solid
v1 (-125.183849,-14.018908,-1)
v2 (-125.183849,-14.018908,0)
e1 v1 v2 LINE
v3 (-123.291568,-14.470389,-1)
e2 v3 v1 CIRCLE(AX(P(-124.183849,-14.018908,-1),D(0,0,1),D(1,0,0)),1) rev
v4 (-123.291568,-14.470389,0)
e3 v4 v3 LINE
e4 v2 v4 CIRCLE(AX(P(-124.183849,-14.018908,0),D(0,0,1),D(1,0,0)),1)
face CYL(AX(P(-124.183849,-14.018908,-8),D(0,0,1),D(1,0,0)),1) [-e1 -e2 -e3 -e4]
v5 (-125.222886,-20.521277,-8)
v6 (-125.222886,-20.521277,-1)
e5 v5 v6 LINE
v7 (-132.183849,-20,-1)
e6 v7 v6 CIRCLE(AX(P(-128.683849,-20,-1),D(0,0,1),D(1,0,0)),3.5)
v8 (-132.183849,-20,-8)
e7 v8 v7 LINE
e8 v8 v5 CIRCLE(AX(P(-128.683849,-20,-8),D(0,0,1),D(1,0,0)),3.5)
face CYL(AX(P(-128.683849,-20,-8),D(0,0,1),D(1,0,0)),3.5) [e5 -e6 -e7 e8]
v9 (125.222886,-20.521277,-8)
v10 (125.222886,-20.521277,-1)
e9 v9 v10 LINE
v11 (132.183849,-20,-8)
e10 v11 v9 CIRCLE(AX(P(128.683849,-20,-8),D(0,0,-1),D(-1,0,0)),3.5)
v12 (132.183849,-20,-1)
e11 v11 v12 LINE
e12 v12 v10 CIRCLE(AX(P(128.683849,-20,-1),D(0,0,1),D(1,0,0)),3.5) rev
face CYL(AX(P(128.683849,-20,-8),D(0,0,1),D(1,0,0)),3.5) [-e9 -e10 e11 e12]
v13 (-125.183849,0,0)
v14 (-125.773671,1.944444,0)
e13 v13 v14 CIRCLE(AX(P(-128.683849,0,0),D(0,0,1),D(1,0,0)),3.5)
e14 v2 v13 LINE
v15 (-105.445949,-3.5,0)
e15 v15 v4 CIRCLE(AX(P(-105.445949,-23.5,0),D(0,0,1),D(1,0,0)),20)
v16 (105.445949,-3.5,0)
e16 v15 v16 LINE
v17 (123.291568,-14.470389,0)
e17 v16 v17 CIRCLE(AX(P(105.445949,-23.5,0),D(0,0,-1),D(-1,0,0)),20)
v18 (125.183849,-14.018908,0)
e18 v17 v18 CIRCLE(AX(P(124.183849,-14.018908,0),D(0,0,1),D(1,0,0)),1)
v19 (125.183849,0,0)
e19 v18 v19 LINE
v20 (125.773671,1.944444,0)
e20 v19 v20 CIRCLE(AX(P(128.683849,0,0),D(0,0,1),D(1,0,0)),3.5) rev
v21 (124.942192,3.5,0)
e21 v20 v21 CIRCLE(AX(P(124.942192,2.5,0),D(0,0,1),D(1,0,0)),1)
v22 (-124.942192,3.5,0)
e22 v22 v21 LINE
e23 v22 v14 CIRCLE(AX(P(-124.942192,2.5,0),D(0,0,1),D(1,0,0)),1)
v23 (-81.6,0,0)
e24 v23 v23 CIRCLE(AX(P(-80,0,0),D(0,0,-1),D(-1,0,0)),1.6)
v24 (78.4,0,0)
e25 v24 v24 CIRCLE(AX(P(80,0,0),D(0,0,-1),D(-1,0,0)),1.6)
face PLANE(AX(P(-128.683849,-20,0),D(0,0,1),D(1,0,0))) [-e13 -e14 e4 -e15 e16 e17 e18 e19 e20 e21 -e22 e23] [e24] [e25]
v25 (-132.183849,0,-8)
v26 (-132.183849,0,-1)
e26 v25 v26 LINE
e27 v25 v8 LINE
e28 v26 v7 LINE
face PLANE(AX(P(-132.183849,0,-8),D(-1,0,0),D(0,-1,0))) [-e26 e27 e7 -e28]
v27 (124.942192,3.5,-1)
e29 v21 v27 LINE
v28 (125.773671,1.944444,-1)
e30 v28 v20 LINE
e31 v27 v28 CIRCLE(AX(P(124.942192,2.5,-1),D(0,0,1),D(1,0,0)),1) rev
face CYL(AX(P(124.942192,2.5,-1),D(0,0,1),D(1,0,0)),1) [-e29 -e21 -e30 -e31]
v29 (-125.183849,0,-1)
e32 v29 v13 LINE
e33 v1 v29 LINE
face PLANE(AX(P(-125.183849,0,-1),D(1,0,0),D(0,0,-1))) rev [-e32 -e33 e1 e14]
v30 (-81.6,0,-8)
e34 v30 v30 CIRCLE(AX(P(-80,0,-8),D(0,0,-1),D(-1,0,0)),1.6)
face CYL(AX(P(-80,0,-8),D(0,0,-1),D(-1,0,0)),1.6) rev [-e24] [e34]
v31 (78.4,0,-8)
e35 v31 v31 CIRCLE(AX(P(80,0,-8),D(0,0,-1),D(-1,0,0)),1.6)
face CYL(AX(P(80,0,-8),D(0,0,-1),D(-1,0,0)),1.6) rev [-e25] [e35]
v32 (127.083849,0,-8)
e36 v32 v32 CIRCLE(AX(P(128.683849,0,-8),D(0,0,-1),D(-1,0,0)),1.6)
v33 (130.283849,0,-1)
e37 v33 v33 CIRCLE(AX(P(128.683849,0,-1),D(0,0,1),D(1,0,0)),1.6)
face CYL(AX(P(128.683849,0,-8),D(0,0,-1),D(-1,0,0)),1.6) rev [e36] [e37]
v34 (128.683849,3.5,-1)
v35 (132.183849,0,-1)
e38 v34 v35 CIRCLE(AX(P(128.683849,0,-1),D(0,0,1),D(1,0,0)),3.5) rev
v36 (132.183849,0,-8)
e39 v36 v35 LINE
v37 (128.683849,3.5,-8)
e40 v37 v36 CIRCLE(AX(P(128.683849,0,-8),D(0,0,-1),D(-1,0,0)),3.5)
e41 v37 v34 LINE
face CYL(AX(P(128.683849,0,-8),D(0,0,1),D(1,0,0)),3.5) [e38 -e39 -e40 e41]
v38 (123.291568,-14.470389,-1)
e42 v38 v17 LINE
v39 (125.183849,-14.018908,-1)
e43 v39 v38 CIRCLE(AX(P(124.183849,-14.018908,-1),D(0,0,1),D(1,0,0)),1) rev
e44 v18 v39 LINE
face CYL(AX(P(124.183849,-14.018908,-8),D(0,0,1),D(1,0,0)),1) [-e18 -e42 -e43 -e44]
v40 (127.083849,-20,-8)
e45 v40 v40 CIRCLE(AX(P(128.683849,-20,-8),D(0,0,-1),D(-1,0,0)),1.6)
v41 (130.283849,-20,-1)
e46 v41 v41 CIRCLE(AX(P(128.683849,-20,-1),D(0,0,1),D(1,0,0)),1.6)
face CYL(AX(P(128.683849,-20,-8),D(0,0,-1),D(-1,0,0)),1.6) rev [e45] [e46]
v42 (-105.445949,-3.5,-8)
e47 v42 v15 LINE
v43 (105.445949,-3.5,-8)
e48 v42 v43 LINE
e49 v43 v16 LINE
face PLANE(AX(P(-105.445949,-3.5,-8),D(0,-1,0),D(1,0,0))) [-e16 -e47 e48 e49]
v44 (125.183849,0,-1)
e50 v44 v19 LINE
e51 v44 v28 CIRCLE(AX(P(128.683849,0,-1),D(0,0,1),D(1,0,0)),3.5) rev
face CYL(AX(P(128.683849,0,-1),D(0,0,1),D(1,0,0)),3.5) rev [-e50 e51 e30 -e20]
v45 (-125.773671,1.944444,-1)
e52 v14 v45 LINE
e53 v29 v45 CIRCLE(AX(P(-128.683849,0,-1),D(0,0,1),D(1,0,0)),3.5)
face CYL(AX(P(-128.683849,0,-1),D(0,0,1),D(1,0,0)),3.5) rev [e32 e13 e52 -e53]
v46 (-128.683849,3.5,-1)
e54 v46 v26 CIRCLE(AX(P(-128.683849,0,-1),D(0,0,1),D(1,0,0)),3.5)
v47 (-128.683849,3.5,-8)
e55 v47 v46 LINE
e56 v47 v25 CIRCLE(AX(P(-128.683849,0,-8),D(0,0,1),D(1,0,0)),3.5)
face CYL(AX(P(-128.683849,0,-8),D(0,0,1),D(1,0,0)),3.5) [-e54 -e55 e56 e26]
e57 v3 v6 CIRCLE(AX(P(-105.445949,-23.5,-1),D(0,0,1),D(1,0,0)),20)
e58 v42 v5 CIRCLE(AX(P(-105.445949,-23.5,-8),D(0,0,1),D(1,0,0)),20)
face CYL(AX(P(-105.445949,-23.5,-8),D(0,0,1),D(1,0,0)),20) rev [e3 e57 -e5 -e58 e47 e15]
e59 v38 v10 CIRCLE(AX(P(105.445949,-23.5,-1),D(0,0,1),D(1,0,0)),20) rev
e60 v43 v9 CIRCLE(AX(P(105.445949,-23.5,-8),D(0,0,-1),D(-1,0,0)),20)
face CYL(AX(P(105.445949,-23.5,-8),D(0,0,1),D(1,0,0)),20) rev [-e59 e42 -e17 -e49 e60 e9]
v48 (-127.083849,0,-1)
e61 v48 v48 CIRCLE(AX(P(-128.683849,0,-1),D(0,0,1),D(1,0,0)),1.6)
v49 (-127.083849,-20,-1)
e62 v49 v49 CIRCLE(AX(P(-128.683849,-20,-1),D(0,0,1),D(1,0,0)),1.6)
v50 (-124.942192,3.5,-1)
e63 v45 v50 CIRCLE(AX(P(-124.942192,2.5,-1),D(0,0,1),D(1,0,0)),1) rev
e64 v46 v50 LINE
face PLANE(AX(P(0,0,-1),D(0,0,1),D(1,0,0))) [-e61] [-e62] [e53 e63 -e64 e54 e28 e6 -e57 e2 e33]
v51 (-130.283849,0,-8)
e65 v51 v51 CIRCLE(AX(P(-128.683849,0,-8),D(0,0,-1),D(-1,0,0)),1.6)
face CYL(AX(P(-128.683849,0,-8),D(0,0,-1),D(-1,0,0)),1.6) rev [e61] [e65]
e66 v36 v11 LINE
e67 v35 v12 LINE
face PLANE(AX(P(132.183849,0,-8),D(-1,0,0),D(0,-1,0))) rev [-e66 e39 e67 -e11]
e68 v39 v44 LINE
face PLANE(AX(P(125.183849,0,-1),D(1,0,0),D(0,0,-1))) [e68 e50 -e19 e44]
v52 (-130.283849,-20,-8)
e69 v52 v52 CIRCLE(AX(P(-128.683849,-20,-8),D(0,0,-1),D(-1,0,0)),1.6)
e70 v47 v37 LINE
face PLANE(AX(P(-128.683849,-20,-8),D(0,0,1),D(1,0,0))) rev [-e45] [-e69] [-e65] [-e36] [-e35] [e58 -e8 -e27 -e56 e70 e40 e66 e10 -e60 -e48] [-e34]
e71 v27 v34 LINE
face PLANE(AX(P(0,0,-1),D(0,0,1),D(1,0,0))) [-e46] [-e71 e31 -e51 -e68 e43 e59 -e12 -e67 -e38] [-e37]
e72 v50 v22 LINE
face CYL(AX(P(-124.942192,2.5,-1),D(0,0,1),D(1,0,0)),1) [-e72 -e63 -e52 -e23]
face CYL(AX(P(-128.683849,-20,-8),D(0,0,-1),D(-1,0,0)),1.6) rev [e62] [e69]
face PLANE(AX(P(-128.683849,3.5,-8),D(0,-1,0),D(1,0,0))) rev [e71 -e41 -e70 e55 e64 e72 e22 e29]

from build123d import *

# Parameters (mm, degrees)
EXTRUDE_1_DEPTH     = 8
CUT_EXTRUDE_1_DEPTH = 1
FILLET_1_R          = 1
HOLE_WIZARD_M3_1_D  = 3.2


with BuildPart() as part:
    # ｽｹｯﾁ1 → ﾎﾞｽ - 押し出し1 (new body)
    with BuildSketch(Plane.XY):
        with BuildLine():
            Line((-128.683849372, 3.5), (128.683849372, 3.5))
            ThreePointArc((128.683849372, 3.5), (131.158723106, 2.474873734), (132.183849372, 0))
            Line((132.183849372, 0), (132.183849372, -20))
            ThreePointArc((132.183849372, -20), (128.945217461, -23.490227317), (125.222885531, -20.521276596))
            ThreePointArc((125.222885531, -20.521276596), (118.492510756, -8.341265421), (105.445949295, -3.5))
            Line((105.445949295, -3.5), (-105.445949295, -3.5))
            ThreePointArc((-105.445949295, -3.5), (-118.492510756, -8.341265421), (-125.222885531, -20.521276596))
            ThreePointArc((-125.222885531, -20.521276596), (-128.945217461, -23.490227317), (-132.183849372, -20))
            Line((-132.183849372, -20), (-132.183849372, 0))
            ThreePointArc((-132.183849372, 0), (-131.158723106, 2.474873734), (-128.683849372, 3.5))
        make_face()
    extrude(amount=-EXTRUDE_1_DEPTH)

    # ｽｹｯﾁ1<4> → ｶｯﾄ - 押し出し1 (cut)
    with BuildSketch(Plane.XY):
        with BuildLine():
            ThreePointArc((-125.183849372, 0), (-126.208975638, 2.474873734), (-128.683849372, 3.5))
            ThreePointArc((-128.683849372, 3.5), (-131.158723106, 2.474873734), (-132.183849372, 0))
            Line((-132.183849372, 0), (-132.183849372, -20))
            ThreePointArc((-132.183849372, -20), (-128.945217461, -23.490227317), (-125.222885531, -20.521276596))
            ThreePointArc((-125.222885531, -20.521276596), (-125.203758298, -20.396939676), (-125.183849372, -20.272725524))
            Line((-125.183849372, -20.272725524), (-125.183849372, 0))
        make_face()
        with BuildLine():
            Line((125.183849372, 0), (125.183849372, -20.272725524))
            ThreePointArc((125.183849372, -20.272725524), (125.203758298, -20.396939676), (125.222885531, -20.521276596))
            ThreePointArc((125.222885531, -20.521276596), (128.945217461, -23.490227317), (132.183849372, -20))
            Line((132.183849372, -20), (132.183849372, 0))
            ThreePointArc((132.183849372, 0), (131.158723106, 2.474873734), (128.683849372, 3.5))
            ThreePointArc((128.683849372, 3.5), (126.208975638, 2.474873734), (125.183849372, 0))
        make_face()
    extrude(amount=-CUT_EXTRUDE_1_DEPTH, mode=Mode.SUBTRACT)

    # ﾌｨﾚｯﾄ1
    fillet_1_edges = [part.edges().sort_by_distance(p)[0] for p in [
        (-128.683849372, 3.5, -0.5),
        (-125.183849372, -20.272725524, -0.5),
        (128.683849372, 3.5, -0.5),
        (125.183849372, -20.272725524, -0.5),
    ]]
    fillet(fillet_1_edges, radius=FILLET_1_R - 0.0001)  # a hair under: the kernel refuses the full size

    # M3 すきま穴1 (through all)
    with Locations(Plane(origin=(-128.683849372, -20, -8), x_dir=(-1, 0, 0), z_dir=(0, 0, -1))):
        with Locations((0, 0), (0, 20), (-48.683849372, 20), (-257.367698744, 0), (-257.367698744, 20), (-208.683849372, 20)):
            Hole(HOLE_WIZARD_M3_1_D / 2)


solid = part.part
